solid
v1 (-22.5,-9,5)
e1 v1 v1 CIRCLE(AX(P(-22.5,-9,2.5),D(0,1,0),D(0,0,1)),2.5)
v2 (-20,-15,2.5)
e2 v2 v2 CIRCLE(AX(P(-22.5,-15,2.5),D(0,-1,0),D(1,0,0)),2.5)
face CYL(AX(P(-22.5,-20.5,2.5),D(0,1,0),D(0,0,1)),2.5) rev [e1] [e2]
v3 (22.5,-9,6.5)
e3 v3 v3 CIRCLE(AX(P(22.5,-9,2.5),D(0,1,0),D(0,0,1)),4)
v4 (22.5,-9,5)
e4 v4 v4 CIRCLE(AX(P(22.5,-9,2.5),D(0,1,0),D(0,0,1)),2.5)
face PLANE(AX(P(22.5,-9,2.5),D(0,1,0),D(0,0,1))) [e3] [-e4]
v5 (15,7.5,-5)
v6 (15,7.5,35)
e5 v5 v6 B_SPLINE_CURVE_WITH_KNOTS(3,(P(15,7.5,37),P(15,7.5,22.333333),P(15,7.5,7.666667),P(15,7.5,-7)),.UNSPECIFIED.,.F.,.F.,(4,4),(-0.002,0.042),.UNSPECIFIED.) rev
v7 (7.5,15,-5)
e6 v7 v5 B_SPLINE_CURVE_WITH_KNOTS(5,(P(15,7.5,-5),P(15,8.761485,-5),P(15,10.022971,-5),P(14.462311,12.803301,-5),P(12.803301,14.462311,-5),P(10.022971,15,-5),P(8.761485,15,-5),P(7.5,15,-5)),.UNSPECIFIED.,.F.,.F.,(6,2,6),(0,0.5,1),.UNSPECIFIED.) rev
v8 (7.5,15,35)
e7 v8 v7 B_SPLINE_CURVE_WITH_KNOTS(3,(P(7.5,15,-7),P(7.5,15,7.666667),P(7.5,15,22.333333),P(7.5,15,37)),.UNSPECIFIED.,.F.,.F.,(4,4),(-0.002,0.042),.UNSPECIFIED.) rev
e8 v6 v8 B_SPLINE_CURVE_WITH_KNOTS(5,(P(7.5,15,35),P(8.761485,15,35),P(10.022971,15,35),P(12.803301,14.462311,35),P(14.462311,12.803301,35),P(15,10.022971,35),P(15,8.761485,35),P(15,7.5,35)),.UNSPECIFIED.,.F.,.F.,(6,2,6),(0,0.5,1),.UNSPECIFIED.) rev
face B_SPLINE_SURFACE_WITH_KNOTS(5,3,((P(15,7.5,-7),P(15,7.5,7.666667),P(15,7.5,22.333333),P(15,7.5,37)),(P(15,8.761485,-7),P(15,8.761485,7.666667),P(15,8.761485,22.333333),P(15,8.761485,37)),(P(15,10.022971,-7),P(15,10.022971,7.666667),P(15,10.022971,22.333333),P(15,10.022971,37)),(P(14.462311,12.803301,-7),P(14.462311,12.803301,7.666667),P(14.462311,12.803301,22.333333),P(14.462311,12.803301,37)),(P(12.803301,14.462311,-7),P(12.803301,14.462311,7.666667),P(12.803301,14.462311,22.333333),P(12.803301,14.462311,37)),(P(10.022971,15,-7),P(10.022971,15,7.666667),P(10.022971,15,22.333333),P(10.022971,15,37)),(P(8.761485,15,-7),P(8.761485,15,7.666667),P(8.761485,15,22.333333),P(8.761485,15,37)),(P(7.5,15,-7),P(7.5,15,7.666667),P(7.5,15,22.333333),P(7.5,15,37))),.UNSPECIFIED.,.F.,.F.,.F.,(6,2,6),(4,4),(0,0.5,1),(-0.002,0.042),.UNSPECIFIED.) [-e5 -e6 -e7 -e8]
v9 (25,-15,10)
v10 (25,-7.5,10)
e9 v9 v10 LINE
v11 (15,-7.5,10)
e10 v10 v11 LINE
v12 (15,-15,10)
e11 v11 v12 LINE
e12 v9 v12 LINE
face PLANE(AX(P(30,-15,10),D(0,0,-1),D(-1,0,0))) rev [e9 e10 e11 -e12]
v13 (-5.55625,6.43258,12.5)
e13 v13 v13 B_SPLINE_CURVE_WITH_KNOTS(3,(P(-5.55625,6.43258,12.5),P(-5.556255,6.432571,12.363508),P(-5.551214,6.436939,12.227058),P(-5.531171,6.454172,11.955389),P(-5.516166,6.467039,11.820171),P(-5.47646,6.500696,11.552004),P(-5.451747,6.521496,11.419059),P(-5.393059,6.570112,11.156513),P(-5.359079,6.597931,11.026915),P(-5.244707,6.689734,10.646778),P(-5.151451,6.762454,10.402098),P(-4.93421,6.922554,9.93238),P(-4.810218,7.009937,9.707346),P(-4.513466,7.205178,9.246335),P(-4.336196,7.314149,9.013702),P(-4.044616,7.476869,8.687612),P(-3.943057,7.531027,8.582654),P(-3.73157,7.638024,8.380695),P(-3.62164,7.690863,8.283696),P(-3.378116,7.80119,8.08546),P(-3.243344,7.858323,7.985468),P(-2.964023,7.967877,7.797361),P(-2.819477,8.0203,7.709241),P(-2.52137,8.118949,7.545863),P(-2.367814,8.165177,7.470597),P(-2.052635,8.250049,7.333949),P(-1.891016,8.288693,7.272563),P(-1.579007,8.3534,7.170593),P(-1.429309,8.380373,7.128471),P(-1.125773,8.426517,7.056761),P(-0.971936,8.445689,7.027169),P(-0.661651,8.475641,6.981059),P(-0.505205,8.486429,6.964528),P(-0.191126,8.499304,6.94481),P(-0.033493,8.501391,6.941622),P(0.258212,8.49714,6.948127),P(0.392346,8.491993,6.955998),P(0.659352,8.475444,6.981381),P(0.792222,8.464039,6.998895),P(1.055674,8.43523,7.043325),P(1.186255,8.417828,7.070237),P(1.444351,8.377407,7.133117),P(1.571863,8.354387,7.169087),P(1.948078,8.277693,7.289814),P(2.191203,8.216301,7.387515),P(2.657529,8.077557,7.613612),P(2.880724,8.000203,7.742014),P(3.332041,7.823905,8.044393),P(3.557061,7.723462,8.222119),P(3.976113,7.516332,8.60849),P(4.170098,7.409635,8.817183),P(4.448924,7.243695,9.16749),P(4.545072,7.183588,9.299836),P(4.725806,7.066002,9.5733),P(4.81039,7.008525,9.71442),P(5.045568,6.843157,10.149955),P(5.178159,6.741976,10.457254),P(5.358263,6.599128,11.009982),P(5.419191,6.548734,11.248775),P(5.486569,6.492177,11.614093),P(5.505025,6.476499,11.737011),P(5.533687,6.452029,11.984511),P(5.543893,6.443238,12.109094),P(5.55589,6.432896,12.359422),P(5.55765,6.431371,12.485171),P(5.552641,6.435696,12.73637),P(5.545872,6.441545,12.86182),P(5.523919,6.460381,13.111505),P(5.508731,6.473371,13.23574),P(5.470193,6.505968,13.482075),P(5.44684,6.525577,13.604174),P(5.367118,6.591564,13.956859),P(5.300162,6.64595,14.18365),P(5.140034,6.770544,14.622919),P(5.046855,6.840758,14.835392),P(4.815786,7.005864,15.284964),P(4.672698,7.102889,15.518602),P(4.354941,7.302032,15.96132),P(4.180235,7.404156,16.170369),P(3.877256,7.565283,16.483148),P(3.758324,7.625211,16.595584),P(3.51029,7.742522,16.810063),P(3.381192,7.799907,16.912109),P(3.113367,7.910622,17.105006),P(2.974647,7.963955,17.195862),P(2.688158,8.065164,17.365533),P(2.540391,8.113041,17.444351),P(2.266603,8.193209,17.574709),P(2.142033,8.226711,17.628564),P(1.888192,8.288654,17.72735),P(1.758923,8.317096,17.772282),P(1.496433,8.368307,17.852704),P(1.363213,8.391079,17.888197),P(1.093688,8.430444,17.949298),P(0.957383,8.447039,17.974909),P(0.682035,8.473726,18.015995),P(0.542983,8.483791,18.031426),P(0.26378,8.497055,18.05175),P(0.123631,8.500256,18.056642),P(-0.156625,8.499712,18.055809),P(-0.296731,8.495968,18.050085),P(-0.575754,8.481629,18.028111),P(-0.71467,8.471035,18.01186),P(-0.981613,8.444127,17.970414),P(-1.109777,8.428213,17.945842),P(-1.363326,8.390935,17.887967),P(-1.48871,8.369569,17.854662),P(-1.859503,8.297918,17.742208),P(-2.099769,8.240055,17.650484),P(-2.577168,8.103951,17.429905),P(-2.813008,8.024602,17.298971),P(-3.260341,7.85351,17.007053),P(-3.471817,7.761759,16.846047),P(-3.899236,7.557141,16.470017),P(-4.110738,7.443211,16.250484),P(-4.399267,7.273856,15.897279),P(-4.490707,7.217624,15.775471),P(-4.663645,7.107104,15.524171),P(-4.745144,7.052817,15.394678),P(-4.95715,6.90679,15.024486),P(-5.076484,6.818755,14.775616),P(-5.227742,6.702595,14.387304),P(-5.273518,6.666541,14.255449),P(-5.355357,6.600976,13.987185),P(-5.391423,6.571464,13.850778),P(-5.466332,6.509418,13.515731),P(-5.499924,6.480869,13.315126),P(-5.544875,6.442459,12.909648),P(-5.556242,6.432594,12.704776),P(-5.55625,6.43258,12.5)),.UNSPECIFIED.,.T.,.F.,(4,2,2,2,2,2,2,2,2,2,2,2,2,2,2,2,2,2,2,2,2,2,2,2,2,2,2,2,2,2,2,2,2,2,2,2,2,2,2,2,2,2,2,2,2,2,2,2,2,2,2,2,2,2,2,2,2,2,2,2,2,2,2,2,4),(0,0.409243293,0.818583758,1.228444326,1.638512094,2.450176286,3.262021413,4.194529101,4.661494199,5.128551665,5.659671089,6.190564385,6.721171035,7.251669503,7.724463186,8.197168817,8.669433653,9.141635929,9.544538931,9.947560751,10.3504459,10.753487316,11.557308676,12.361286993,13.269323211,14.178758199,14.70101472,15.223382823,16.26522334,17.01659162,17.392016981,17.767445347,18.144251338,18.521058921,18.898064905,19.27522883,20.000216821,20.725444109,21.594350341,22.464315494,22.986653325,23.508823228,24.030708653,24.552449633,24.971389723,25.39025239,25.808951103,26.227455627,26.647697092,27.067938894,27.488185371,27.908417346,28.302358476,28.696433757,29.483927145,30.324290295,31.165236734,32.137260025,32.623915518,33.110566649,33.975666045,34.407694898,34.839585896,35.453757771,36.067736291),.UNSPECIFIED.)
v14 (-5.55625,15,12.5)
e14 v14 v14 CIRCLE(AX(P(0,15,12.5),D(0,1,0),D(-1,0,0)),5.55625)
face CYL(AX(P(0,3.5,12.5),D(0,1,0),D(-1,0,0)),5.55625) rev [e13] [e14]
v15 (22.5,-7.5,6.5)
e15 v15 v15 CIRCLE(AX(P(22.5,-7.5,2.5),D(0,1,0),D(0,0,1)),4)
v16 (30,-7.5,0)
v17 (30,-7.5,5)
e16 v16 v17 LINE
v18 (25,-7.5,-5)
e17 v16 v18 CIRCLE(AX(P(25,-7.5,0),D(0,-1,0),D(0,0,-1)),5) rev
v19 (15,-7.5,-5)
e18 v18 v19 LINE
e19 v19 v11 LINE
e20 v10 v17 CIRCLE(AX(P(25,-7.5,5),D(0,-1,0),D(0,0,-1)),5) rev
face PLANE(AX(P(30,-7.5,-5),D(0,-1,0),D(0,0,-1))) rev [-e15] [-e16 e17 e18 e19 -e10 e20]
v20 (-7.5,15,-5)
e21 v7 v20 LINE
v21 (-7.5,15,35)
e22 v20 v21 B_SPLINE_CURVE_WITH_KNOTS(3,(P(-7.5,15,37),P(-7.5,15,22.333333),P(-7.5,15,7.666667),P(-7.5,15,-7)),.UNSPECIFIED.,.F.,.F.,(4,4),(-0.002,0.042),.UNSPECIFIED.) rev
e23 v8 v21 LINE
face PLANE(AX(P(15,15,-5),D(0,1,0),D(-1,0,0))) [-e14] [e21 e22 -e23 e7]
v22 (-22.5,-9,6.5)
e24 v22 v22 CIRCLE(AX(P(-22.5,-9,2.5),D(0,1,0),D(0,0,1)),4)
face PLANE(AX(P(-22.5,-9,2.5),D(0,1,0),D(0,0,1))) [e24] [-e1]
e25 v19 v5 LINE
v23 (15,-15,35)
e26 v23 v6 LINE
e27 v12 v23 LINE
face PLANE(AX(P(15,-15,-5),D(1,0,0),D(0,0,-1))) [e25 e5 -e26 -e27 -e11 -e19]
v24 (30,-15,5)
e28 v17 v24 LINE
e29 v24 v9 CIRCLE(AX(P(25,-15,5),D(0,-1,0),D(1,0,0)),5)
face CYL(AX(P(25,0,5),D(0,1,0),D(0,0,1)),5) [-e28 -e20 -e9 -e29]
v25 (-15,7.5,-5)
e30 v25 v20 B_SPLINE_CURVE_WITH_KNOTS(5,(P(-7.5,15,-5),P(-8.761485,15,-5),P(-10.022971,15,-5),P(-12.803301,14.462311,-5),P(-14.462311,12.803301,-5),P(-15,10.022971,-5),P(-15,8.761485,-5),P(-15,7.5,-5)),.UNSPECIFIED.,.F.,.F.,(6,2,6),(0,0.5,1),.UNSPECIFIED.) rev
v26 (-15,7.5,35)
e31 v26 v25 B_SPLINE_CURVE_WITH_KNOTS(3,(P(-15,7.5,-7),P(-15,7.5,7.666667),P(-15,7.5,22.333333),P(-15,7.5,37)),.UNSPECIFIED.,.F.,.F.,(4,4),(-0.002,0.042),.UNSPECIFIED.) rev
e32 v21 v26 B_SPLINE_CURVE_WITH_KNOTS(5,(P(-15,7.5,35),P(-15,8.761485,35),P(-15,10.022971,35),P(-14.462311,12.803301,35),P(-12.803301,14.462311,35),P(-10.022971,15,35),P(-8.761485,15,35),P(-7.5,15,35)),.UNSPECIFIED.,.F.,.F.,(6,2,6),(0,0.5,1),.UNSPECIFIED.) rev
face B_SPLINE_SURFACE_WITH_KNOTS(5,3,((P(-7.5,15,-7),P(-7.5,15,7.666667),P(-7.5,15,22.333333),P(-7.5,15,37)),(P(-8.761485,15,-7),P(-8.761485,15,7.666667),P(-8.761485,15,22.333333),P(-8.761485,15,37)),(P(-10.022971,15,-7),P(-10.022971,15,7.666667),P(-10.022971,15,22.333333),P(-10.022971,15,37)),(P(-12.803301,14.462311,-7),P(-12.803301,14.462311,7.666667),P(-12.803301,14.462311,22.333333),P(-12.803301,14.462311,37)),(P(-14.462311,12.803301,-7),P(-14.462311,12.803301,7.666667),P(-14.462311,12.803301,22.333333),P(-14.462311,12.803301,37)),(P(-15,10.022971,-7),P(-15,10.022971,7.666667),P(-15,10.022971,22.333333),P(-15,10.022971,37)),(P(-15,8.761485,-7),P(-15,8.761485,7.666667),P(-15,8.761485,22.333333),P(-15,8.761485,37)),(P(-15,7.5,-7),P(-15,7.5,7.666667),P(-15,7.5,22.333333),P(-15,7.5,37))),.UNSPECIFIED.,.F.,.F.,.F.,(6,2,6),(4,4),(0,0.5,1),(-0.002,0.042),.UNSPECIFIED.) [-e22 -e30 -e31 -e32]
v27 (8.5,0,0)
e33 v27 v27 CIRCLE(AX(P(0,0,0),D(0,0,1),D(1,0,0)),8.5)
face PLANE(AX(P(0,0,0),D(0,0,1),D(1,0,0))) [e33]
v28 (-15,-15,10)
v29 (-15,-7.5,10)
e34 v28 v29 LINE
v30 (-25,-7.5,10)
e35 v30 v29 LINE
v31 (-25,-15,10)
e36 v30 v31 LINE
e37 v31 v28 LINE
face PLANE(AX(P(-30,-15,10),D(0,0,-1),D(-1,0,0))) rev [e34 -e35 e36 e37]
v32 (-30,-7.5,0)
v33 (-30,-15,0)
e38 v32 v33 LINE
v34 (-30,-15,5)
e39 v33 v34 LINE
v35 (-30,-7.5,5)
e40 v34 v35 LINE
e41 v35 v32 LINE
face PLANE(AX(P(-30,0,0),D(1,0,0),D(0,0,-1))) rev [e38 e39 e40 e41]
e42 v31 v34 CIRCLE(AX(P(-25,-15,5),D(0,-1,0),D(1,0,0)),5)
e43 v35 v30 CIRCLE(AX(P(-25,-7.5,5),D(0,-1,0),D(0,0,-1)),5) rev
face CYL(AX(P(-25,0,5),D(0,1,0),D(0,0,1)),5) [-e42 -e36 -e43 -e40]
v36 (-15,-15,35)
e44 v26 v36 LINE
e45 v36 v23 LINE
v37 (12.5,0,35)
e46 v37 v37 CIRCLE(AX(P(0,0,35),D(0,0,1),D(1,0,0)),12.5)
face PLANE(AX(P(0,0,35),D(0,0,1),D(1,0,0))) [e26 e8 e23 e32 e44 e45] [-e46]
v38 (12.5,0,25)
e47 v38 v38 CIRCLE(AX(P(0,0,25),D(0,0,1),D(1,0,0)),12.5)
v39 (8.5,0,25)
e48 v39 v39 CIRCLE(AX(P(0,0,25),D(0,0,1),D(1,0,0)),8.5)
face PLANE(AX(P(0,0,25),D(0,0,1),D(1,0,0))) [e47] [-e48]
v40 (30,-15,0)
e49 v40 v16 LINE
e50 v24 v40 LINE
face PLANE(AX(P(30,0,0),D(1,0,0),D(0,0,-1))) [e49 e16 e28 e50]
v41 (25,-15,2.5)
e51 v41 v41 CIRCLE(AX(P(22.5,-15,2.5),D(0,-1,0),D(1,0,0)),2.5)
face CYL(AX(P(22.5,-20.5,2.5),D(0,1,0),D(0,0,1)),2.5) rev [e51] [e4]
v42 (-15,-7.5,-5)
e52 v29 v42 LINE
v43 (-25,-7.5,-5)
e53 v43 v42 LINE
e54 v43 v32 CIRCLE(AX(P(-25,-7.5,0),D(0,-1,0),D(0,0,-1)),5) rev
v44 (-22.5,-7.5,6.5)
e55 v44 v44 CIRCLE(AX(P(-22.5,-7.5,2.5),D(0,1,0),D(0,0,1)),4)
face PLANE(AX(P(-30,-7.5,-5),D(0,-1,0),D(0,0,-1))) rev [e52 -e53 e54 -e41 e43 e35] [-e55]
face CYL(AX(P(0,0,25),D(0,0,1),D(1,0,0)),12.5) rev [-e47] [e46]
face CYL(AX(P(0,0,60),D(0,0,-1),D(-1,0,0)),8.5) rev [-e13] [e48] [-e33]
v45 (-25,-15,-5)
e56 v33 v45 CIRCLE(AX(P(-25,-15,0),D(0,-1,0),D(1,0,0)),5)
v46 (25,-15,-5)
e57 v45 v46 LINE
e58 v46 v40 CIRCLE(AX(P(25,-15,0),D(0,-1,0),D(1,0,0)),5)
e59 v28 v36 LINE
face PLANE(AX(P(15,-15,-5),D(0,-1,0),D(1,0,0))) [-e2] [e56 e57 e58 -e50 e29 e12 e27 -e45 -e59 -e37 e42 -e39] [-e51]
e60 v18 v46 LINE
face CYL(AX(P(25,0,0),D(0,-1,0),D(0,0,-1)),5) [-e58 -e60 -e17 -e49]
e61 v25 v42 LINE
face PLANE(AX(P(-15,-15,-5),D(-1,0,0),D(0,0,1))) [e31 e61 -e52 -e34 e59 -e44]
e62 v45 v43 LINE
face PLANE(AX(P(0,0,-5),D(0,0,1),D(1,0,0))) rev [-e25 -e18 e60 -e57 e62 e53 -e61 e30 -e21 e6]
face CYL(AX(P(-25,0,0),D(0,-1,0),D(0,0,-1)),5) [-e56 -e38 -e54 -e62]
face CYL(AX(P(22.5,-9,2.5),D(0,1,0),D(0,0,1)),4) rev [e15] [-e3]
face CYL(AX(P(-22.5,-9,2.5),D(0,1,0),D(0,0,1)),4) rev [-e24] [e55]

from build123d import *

# Parameters (mm, degrees)
BOSS_EXTRUDE1_DEPTH      = 35
BOSS_EXTRUDE1_DEPTH_BACK = 5
SKETCH1_W                = 30
SKETCH1_H                = 30
FILLET1_SIZE             = 7.5
SKETCH2_R                = 8.5
CUT_EXTRUDE1_DEPTH       = 60
SKETCH3_W                = 15
SKETCH3_H                = 7.5
BOSS_EXTRUDE2_DEPTH      = 15
SKETCH5_W                = 15
SKETCH5_H                = 7.5
BOSS_EXTRUDE4_DEPTH      = 15
SKETCH11_R               = 12.5
CUT_EXTRUDE3_DEPTH       = 10
FILLET8_R                = 5
SKETCH15_R               = 4
CUT_EXTRUDE5_DEPTH       = 1.5
SKETCH19_R               = 5.55625
CUT_EXTRUDE10_DEPTH      = 11.5
SKETCH21_R               = 2.5
CUT_EXTRUDE11_DEPTH      = 11.5


with BuildPart() as part:
    # Sketch1 → Boss-Extrude1 (new, two sides: drawn at the far end of the back side and taken through both)
    with BuildSketch(Plane.XY.offset(-BOSS_EXTRUDE1_DEPTH_BACK)):
        Rectangle(SKETCH1_W, SKETCH1_H)
    extrude(amount=BOSS_EXTRUDE1_DEPTH + BOSS_EXTRUDE1_DEPTH_BACK)

    # Fillet1
    # a fillet whose section is not a circle: 7.5 mm, written as the material it takes off along each edge
    with BuildSketch(Plane(origin=(-15, 15, 53.75), x_dir=(1, 0, 0), z_dir=(0, 0, -1))) as fillet1_piece_1:
        with BuildLine():
            add(Edge.make_bspline([(FILLET1_SIZE, 0), (FILLET1_SIZE * 0.831801948466, 0), (FILLET1_SIZE * 0.663603896932, 0), (FILLET1_SIZE * 0.292893218813, FILLET1_SIZE * 0.0716919198361), (FILLET1_SIZE * 0.0716919198361, FILLET1_SIZE * 0.292893218813), (0, FILLET1_SIZE * 0.663603896932), (0, FILLET1_SIZE * 0.831801948466), (0, FILLET1_SIZE)], knots=[0, 0, 0, 0, 0, 0, 0.5, 0.5, 1, 1, 1, 1, 1, 1], degree=5))
            Line((0, FILLET1_SIZE), (0, 0))
            Line((0, 0), (FILLET1_SIZE, 0))
        make_face()
    extrude(amount=77.5, mode=Mode.SUBTRACT)
    with BuildSketch(Plane(origin=(15, 15, -23.75), x_dir=(0, -1, 0), z_dir=(0, 0, 1))) as fillet1_piece_2:
        with BuildLine():
            add(Edge.make_bspline([(FILLET1_SIZE, 0), (FILLET1_SIZE * 0.831801948466, 0), (FILLET1_SIZE * 0.663603896932, 0), (FILLET1_SIZE * 0.292893218813, -FILLET1_SIZE * 0.0716919198361), (FILLET1_SIZE * 0.0716919198361, -FILLET1_SIZE * 0.292893218813), (0, -FILLET1_SIZE * 0.663603896932), (0, -FILLET1_SIZE * 0.831801948466), (0, -FILLET1_SIZE)], knots=[0, 0, 0, 0, 0, 0, 0.5, 0.5, 1, 1, 1, 1, 1, 1], degree=5))
            Line((0, -FILLET1_SIZE), (0, 0))
            Line((0, 0), (FILLET1_SIZE, 0))
        make_face()
    extrude(amount=77.5, mode=Mode.SUBTRACT)

    # Sketch2 → Cut-Extrude1 (cut)
    with BuildSketch(Plane.XY):
        with Locations(Location((0, 0, 0), (0, 0, 180))):
            Circle(SKETCH2_R)
    extrude(amount=CUT_EXTRUDE1_DEPTH, mode=Mode.SUBTRACT)

    # Sketch3 → Boss-Extrude2 (add)
    with BuildSketch(Plane(origin=(15, 0, 0), x_dir=(0, 0, -1), z_dir=(1, 0, 0))):
        with Locations((-2.5, -11.25)):
            Rectangle(SKETCH3_W, SKETCH3_H)
    extrude(amount=BOSS_EXTRUDE2_DEPTH)

    # Sketch5 → Boss-Extrude4 (add)
    with BuildSketch(Plane.ZY.offset(15)):
        with Locations((2.5, -11.25)):
            Rectangle(SKETCH5_W, SKETCH5_H)
    extrude(amount=BOSS_EXTRUDE4_DEPTH)

    # Sketch11 → Cut-Extrude3 (cut)
    with BuildSketch(Plane.XY.offset(35)):
        Circle(SKETCH11_R)
    extrude(amount=-CUT_EXTRUDE3_DEPTH, mode=Mode.SUBTRACT)

    # Fillet8
    fillet8_edges = [part.edges().sort_by_distance(p)[0] for p in [
        (30, -11.25, -5),
        (30, -11.25, 10),
        (-30, -11.25, -5),
        (-30, -11.25, 10),
    ]]
    fillet(fillet8_edges, radius=FILLET8_R)

    # Sketch15 → Cut-Extrude5 (cut)
    with BuildSketch(Plane(origin=(0, -7.5, 0), x_dir=(1, 0, 0), z_dir=(0, 1, 0))):
        with Locations(Location((22.5, -2.5, 0), (0, 0, 270))):
            Circle(SKETCH15_R)
        with Locations(Location((-22.5, -2.5, 0), (0, 0, 270))):
            Circle(SKETCH15_R)
    extrude(amount=-CUT_EXTRUDE5_DEPTH, mode=Mode.SUBTRACT)

    # Sketch19 → Cut-Extrude10 (cut)
    with BuildSketch(Plane(origin=(0, 15, 0), x_dir=(1, 0, 0), z_dir=(0, 1, 0))):
        with Locations(Location((0, -12.5, 0), (0, 0, 180))):
            Circle(SKETCH19_R)
    extrude(amount=-CUT_EXTRUDE10_DEPTH, mode=Mode.SUBTRACT)

    # Sketch21 → Cut-Extrude11 (cut)
    with BuildSketch(Plane(origin=(0, -9, 0), x_dir=(1, 0, 0), z_dir=(0, 1, 0))):
        with Locations(Location((-22.5, -2.5, 0), (0, 0, 270))):
            Circle(SKETCH21_R)
        with Locations(Location((22.5, -2.5, 0), (0, 0, 270))):
            Circle(SKETCH21_R)
    extrude(amount=-CUT_EXTRUDE11_DEPTH, mode=Mode.SUBTRACT)


solid = part.part
